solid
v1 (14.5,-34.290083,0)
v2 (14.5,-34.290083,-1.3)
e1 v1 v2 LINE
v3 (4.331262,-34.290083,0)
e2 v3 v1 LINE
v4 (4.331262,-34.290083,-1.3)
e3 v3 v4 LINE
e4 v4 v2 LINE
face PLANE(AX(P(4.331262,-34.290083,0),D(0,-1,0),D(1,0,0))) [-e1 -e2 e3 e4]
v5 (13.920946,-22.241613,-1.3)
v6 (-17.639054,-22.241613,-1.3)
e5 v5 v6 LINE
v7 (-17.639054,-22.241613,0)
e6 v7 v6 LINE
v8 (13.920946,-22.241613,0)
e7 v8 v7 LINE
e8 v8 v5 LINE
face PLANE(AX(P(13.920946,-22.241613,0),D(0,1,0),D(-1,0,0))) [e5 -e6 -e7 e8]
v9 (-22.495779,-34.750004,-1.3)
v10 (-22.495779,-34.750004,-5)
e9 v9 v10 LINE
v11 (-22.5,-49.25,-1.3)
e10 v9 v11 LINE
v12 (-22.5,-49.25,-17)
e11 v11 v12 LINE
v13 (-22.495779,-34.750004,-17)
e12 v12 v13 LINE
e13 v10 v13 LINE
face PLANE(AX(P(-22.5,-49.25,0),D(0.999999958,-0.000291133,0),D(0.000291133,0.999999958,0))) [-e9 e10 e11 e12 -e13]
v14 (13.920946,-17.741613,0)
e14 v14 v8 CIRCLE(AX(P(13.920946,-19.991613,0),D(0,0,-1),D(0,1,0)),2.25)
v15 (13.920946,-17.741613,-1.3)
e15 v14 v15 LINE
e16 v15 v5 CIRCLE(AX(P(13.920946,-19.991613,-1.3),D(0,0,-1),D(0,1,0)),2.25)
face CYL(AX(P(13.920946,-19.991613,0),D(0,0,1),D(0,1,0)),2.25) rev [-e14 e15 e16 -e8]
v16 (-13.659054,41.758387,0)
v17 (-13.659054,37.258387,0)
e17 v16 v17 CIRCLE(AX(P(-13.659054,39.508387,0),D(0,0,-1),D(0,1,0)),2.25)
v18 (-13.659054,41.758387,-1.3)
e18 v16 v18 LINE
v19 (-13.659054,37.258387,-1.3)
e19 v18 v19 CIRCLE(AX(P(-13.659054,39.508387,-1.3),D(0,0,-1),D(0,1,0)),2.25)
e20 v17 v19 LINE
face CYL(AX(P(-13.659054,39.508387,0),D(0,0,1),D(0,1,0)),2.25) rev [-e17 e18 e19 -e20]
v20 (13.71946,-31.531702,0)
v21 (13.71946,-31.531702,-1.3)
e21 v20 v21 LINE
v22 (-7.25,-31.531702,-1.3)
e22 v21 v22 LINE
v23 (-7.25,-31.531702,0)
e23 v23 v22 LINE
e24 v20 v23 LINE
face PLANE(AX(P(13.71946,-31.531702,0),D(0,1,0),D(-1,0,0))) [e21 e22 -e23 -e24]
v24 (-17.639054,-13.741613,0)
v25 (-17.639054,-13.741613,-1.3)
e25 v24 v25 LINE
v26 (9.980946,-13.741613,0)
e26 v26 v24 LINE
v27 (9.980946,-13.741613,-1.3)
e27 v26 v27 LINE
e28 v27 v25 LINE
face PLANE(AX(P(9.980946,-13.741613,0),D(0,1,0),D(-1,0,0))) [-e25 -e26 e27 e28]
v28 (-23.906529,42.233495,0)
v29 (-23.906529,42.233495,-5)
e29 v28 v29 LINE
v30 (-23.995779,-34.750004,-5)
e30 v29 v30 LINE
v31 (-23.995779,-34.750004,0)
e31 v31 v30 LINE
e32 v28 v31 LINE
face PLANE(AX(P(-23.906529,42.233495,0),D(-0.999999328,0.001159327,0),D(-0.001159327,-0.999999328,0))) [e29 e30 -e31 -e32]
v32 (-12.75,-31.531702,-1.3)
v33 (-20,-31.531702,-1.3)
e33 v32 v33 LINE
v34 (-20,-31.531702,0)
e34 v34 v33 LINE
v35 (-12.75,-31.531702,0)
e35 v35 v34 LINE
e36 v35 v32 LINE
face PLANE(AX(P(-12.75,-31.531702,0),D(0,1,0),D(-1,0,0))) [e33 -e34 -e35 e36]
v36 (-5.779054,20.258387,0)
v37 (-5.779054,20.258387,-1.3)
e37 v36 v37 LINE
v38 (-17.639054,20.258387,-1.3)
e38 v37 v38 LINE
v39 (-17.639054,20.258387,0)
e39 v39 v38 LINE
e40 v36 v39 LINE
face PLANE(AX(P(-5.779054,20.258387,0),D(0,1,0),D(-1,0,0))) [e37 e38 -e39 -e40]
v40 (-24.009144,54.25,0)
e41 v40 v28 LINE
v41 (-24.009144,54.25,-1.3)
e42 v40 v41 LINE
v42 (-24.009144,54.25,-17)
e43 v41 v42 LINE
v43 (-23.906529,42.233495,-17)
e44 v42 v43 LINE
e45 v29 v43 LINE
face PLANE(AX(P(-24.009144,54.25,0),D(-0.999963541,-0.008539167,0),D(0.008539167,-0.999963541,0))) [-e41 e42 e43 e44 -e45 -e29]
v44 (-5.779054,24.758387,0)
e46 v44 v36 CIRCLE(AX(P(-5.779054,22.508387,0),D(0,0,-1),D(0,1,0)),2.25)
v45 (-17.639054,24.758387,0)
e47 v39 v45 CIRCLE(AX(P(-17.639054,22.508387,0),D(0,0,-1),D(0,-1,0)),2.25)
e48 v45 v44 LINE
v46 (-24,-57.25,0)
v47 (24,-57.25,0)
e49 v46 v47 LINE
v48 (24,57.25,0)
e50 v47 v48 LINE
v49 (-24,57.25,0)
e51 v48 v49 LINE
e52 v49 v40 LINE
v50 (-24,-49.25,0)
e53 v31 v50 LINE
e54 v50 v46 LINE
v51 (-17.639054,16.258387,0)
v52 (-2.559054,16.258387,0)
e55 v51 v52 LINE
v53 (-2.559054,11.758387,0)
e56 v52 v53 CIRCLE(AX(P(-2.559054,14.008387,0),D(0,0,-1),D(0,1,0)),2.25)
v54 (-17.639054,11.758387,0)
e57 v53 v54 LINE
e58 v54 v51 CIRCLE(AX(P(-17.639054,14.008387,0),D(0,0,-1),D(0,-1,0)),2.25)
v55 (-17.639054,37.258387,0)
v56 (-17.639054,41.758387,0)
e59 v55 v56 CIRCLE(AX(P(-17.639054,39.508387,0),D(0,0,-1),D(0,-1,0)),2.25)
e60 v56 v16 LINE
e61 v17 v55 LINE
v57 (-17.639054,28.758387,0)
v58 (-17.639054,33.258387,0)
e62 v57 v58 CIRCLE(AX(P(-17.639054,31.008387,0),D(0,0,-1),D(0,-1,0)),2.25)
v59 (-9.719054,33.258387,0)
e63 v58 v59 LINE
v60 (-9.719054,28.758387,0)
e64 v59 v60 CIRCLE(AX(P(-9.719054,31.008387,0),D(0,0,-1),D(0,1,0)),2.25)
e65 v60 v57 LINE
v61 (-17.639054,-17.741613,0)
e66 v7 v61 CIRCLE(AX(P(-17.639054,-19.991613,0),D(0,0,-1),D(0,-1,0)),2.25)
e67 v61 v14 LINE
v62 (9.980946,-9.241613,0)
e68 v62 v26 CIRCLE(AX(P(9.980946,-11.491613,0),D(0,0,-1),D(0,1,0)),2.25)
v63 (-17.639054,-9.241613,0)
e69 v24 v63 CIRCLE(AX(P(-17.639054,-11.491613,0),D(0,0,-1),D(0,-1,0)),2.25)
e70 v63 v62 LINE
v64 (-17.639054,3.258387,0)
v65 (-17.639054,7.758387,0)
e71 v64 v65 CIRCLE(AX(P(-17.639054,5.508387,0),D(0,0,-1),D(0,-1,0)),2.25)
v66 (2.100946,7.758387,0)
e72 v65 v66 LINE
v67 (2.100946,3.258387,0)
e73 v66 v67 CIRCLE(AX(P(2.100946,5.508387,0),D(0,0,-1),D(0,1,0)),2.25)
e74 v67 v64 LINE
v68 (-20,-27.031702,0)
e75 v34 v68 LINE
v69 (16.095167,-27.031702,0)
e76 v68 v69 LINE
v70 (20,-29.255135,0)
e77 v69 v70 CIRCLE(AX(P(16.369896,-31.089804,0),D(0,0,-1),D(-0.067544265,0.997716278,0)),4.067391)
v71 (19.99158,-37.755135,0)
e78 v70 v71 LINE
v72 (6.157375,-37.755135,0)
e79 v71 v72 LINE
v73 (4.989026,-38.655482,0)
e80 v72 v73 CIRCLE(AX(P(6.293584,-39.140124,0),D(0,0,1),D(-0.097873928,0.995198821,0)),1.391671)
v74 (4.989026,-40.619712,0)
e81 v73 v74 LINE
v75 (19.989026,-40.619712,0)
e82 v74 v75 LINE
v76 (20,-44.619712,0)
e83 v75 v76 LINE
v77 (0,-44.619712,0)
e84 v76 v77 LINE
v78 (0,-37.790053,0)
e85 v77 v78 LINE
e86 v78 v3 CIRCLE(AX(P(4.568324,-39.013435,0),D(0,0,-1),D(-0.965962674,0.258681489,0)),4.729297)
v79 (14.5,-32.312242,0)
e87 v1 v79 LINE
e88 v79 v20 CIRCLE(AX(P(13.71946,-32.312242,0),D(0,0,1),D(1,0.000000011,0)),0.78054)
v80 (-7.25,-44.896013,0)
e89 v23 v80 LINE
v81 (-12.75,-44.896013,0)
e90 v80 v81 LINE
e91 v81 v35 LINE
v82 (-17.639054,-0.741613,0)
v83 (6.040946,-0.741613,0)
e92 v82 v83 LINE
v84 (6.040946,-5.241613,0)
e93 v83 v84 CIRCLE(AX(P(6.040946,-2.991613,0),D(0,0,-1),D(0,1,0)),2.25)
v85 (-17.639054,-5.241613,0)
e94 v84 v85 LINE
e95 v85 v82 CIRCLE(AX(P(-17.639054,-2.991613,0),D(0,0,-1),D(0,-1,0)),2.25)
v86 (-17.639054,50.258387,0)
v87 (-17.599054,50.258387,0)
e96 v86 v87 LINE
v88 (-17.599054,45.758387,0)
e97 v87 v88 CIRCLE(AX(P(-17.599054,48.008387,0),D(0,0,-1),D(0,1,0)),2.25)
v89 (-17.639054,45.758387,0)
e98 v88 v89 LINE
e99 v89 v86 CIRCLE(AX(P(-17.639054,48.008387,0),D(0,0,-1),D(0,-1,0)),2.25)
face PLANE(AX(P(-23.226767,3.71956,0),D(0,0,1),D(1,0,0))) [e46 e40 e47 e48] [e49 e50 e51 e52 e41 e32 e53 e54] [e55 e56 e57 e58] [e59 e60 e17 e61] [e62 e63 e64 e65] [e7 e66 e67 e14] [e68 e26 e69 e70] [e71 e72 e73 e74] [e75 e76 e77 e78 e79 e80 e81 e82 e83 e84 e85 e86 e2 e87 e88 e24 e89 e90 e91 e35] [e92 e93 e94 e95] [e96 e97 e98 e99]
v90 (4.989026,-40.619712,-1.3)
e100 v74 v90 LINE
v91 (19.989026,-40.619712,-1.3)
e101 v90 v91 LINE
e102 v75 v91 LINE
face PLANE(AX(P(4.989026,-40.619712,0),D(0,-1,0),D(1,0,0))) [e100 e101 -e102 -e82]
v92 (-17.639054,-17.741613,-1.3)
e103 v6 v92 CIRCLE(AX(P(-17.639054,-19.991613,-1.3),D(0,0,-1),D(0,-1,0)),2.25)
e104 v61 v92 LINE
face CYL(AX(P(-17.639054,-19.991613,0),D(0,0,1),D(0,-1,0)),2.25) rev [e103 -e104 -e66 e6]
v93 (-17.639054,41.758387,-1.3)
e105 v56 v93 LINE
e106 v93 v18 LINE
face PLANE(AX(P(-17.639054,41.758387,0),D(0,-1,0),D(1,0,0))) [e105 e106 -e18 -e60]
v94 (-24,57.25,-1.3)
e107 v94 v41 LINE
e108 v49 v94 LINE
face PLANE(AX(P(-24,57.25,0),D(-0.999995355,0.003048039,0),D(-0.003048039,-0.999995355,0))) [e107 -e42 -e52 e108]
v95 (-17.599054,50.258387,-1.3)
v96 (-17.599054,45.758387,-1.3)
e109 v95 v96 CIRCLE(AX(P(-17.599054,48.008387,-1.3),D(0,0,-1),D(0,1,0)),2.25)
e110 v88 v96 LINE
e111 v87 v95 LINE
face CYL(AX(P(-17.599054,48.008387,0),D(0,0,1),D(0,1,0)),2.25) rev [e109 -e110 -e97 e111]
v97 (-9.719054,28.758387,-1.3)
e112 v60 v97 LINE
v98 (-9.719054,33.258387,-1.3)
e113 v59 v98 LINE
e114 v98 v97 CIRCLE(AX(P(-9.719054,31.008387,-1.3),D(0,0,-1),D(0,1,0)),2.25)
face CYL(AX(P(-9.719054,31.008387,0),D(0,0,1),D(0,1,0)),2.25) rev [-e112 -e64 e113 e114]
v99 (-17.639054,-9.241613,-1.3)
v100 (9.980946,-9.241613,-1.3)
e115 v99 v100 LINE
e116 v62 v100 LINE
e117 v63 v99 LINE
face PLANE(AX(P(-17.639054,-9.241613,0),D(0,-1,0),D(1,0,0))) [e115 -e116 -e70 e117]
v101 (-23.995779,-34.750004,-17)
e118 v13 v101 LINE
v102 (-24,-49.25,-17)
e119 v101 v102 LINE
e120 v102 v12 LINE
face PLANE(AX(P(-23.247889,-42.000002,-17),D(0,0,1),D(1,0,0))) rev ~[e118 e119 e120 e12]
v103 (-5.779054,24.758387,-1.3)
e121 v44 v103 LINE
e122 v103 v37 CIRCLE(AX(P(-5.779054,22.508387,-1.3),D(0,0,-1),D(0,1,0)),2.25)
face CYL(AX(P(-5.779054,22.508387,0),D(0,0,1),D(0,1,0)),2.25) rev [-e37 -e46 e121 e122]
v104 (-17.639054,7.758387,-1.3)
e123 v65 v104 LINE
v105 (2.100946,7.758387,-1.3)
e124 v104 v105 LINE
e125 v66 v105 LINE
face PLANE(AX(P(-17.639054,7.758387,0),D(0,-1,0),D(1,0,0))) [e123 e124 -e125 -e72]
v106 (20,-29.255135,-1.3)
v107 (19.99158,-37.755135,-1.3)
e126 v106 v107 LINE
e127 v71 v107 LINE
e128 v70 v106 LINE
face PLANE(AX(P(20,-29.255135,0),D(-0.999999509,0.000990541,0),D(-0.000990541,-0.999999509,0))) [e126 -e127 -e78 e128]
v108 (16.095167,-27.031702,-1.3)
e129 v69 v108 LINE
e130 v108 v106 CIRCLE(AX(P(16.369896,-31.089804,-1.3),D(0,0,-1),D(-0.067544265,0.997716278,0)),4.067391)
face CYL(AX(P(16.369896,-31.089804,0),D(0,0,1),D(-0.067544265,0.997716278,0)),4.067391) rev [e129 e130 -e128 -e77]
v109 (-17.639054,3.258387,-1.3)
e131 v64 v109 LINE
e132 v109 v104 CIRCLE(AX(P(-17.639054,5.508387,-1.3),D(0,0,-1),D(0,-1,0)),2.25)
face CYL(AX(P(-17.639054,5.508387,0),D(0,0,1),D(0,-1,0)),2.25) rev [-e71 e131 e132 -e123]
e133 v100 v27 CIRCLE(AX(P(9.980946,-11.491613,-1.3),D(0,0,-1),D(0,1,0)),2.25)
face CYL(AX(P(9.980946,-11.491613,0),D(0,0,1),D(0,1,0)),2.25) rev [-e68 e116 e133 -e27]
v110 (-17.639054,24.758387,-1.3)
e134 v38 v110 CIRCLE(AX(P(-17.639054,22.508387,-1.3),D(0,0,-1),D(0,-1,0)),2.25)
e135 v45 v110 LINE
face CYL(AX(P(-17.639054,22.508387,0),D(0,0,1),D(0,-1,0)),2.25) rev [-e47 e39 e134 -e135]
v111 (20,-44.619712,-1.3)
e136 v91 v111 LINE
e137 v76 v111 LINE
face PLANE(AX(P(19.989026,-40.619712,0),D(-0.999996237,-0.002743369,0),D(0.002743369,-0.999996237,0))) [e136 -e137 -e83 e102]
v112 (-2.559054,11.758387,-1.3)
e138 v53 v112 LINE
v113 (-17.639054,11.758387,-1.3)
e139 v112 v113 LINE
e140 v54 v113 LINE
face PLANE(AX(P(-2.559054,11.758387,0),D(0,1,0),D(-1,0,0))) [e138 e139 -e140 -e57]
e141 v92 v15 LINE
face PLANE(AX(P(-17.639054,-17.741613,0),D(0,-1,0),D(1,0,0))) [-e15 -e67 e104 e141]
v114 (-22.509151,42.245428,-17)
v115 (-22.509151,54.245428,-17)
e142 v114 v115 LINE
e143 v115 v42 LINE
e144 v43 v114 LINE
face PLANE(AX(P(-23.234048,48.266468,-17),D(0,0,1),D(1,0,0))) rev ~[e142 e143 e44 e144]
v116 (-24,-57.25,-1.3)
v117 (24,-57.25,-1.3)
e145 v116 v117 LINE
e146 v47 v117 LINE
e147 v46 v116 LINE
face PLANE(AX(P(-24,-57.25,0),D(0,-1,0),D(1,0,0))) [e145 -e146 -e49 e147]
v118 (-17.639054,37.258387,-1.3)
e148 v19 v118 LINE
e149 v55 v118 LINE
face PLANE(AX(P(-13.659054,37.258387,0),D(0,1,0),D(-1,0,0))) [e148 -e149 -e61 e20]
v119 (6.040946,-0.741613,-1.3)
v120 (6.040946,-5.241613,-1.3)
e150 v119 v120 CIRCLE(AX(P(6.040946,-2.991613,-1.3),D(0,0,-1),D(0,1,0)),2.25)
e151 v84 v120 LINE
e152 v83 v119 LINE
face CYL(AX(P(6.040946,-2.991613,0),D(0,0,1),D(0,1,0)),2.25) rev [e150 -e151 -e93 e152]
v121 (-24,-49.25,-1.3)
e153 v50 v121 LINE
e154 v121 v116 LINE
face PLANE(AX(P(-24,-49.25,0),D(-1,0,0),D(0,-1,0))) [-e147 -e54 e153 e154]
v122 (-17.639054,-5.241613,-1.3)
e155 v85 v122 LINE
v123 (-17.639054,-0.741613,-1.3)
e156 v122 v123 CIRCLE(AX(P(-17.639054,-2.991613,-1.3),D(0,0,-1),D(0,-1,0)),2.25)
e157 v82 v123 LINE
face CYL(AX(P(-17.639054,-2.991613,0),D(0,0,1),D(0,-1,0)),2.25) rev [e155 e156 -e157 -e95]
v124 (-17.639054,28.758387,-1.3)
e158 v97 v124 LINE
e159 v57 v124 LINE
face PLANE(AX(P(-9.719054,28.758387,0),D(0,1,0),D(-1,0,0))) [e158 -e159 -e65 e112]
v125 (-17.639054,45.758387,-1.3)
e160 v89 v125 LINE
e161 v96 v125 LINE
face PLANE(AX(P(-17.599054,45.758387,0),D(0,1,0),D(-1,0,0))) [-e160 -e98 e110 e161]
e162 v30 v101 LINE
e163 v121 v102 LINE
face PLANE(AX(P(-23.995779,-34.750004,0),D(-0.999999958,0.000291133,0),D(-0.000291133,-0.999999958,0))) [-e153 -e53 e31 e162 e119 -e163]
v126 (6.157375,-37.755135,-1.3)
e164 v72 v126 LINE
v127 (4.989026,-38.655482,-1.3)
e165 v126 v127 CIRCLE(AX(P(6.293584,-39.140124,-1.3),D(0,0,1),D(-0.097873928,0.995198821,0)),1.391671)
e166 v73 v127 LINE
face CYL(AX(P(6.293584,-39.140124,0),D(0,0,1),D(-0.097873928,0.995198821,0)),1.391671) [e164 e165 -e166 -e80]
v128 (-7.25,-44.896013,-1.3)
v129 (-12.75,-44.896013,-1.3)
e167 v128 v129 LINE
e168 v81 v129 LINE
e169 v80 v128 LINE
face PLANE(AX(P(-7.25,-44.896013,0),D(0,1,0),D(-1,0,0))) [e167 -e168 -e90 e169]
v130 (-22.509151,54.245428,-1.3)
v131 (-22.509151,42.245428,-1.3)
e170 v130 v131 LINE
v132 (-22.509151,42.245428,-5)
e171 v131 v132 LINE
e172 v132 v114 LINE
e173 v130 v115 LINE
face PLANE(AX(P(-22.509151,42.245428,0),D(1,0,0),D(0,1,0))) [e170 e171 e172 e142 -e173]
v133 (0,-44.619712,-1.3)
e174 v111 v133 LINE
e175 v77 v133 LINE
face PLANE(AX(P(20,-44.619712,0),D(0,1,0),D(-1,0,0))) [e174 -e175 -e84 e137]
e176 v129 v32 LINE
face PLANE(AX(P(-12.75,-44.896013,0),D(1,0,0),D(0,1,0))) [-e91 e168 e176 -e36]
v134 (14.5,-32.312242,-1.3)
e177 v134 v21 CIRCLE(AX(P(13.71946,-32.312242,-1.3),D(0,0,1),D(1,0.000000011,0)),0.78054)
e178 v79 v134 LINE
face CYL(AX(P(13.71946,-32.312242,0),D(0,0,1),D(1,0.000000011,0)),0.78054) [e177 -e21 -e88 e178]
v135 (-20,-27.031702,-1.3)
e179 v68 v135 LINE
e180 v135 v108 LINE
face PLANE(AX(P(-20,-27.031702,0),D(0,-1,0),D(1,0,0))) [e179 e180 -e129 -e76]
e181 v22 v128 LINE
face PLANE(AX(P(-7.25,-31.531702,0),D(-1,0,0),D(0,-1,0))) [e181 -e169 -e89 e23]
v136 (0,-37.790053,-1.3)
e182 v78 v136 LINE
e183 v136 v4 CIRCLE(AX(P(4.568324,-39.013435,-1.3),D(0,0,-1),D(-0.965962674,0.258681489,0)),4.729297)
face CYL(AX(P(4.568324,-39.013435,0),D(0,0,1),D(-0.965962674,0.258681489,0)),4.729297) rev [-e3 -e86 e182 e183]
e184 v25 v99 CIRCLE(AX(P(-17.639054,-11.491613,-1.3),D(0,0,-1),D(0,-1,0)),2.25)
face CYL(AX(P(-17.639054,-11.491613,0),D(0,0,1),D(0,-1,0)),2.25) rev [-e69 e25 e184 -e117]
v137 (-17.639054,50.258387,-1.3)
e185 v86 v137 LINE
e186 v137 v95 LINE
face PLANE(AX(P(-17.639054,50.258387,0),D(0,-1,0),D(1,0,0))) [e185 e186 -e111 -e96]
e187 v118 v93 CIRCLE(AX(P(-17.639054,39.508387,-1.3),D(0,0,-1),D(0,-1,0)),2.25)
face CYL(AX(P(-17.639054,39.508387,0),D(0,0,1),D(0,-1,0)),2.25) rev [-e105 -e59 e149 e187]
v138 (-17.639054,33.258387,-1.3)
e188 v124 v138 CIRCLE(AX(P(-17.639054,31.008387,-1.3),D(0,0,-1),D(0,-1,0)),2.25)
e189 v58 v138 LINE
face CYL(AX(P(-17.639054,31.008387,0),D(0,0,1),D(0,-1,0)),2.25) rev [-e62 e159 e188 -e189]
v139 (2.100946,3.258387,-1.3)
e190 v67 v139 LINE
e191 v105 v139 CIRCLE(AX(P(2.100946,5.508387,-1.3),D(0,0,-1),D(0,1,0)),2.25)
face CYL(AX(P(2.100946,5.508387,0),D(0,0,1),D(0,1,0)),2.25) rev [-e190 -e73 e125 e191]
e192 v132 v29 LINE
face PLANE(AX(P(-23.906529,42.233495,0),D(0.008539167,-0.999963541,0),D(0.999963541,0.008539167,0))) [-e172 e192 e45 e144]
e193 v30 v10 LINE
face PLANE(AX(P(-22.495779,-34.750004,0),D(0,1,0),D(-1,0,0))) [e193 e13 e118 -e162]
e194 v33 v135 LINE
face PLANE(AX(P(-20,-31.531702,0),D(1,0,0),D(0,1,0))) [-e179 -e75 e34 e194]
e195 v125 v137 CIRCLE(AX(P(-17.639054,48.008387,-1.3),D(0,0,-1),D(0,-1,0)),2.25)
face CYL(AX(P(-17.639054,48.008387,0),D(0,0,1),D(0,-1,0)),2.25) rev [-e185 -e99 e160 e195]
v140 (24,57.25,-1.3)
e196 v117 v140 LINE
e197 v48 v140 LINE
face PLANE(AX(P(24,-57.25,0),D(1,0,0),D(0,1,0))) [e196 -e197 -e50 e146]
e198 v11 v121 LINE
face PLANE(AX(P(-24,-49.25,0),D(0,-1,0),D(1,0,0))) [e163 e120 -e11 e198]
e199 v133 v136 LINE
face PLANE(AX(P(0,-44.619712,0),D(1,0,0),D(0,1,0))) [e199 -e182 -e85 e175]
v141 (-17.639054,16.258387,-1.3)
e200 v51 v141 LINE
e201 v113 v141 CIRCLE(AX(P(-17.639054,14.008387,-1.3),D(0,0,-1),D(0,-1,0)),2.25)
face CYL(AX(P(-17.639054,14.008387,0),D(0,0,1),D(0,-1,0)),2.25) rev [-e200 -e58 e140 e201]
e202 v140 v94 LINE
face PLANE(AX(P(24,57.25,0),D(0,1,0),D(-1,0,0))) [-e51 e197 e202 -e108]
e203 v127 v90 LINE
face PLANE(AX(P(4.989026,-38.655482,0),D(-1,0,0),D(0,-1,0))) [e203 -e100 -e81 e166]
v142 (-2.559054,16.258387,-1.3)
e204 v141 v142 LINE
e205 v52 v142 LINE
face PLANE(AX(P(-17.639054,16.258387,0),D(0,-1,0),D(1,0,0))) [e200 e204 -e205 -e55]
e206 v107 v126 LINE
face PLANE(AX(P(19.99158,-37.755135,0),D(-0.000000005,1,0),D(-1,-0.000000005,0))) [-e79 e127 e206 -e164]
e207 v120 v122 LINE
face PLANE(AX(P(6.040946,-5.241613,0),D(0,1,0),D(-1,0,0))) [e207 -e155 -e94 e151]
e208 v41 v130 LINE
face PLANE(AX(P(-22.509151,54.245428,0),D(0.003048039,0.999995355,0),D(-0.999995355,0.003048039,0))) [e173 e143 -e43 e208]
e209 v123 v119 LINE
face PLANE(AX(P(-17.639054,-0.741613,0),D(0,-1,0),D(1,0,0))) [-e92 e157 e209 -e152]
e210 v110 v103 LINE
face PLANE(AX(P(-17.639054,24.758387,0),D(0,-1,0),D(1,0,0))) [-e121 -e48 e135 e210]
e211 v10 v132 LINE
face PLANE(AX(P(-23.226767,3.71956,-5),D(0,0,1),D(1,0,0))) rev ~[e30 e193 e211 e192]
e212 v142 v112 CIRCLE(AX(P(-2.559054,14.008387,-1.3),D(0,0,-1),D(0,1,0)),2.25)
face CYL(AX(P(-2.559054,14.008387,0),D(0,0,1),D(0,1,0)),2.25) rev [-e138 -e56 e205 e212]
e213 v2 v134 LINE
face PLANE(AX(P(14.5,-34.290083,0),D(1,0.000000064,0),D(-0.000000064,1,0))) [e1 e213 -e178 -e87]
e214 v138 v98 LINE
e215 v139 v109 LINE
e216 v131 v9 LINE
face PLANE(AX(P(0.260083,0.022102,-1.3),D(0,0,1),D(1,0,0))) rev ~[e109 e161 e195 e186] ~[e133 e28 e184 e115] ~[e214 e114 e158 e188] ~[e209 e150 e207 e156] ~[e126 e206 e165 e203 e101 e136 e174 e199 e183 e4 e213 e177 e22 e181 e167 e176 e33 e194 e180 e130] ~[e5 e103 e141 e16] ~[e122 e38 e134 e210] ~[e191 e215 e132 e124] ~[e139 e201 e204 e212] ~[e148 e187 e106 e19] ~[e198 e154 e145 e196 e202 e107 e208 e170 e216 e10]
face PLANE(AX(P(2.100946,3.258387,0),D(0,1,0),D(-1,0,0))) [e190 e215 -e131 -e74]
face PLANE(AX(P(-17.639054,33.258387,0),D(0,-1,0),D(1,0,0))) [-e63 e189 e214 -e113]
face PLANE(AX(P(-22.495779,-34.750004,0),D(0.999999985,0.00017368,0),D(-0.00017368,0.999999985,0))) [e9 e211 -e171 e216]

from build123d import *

# Parameters (mm, degrees)
F1_DEPTH = 1.3
F2_DEPTH = 17
F4_DEPTH = 5


# Not quite as in the source:
# - a feature names something its author has since deleted; it is built from what else it names


with BuildPart() as f1:
    # F0 (on Top) → F1 (new body)
    with BuildSketch(Plane.XY):
        Polygon((24, 57.25), (-24, 57.25), (-24.0091441598, 54.25), (-22.5091511277, 54.2454279414), (-22.5091511277, 42.2454279414), (-22.4957785658, -34.7500035641), (-22.5, -49.25), (-24, -49.25), (-24, -57.25), (24, -57.25), align=None)
        with BuildLine():
            Line((13.9209458456, -22.2416133583), (-17.6390541544, -22.2416133583))
            ThreePointArc((-17.6390541544, -22.2416133583), (-19.8890541544, -19.9916133583), (-17.6390541544, -17.7416133583))
            Line((-17.6390541544, -17.7416133583), (13.9209458456, -17.7416133583))
            ThreePointArc((13.9209458456, -17.7416133583), (16.1709458456, -19.9916133583), (13.9209458456, -22.2416133583))
        make_face(mode=Mode.SUBTRACT)
        with BuildLine():
            Line((9.9809458456, -13.7416133583), (-17.6390541544, -13.7416133583))
            ThreePointArc((-17.6390541544, -13.7416133583), (-19.8890541544, -11.4916133583), (-17.6390541544, -9.2416133583))
            Line((-17.6390541544, -9.2416133583), (9.9809458456, -9.2416133583))
            ThreePointArc((9.9809458456, -9.2416133583), (12.2309458456, -11.4916133583), (9.9809458456, -13.7416133583))
        make_face(mode=Mode.SUBTRACT)
        with BuildLine():
            Line((6.0409458456, -5.2416133583), (-17.6390541544, -5.2416133583))
            ThreePointArc((-17.6390541544, -5.2416133583), (-19.8890541544, -2.9916133583), (-17.6390541544, -0.7416133583))
            Line((-17.6390541544, -0.7416133583), (6.0409458456, -0.7416133583))
            ThreePointArc((6.0409458456, -0.7416133583), (8.2909458456, -2.9916133583), (6.0409458456, -5.2416133583))
        make_face(mode=Mode.SUBTRACT)
        with BuildLine():
            Line((-19.9999999992, -31.5317022603), (-19.9999999992, -27.0317022603))
            Line((-19.9999999992, -27.0317022603), (16.0951670268, -27.0317022603))
            ThreePointArc((16.0951670268, -27.0317022603), (18.3824934665, -27.555243649), (19.9999999704, -29.25513498))
            Line((19.9999999704, -29.25513498), (19.991580365, -37.75513498))
            Line((19.991580365, -37.75513498), (6.1573753969, -37.7551350426))
            ThreePointArc((6.1573753969, -37.7551350426), (5.4441089744, -38.037790108), (4.9890264818, -38.6554816172))
            Line((4.9890264818, -38.6554816172), (4.9890264818, -40.6197120801))
            Line((4.9890264818, -40.6197120801), (19.9890264818, -40.6197120801))
            Line((19.9890264818, -40.6197120801), (20, -44.6197120801))
            Line((20, -44.6197120801), (0, -44.6197120801))
            Line((0, -44.6197120801), (0, -37.7900532508))
            ThreePointArc((0, -37.7900532508), (1.5958871284, -35.3350022858), (4.3312619815, -34.2900834468))
            Line((4.3312619815, -34.2900834468), (14.5000001306, -34.2900834468))
            Line((14.5000001306, -34.2900834468), (14.5000000048, -32.3122422563))
            ThreePointArc((14.5000000048, -32.3122422563), (14.2713851276, -31.7603171319), (13.7194600008, -31.5317022603))
            Line((13.7194600008, -31.5317022603), (-7.2499999992, -31.5317022603))
            Line((-7.2499999992, -31.5317022603), (-7.2499999992, -44.8960133593))
            Line((-7.2499999992, -44.8960133593), (-12.7499999992, -44.8960133593))
            Line((-12.7499999992, -44.8960133593), (-12.7499999992, -31.5317022603))
            Line((-12.7499999992, -31.5317022603), (-19.9999999992, -31.5317022603))
        make_face(mode=Mode.SUBTRACT)
        with BuildLine():
            Line((2.1009458456, 3.2583866417), (-17.6390541544, 3.2583866417))
            ThreePointArc((-17.6390541544, 3.2583866417), (-19.8890541544, 5.5083866417), (-17.6390541544, 7.7583866417))
            Line((-17.6390541544, 7.7583866417), (2.1009458456, 7.7583866417))
            ThreePointArc((2.1009458456, 7.7583866417), (4.3509458456, 5.5083866417), (2.1009458456, 3.2583866417))
        make_face(mode=Mode.SUBTRACT)
        with BuildLine():
            Line((-2.5590541544, 11.7583866417), (-17.6390541544, 11.7583866417))
            ThreePointArc((-17.6390541544, 11.7583866417), (-19.8890541544, 14.0083866417), (-17.6390541544, 16.2583866417))
            Line((-17.6390541544, 16.2583866417), (-2.5590541544, 16.2583866417))
            ThreePointArc((-2.5590541544, 16.2583866417), (-0.3090541544, 14.0083866417), (-2.5590541544, 11.7583866417))
        make_face(mode=Mode.SUBTRACT)
        with BuildLine():
            Line((-5.7790541544, 20.2583866417), (-17.6390541544, 20.2583866417))
            ThreePointArc((-17.6390541544, 20.2583866417), (-19.8890541544, 22.5083866417), (-17.6390541544, 24.7583866417))
            Line((-17.6390541544, 24.7583866417), (-5.7790541544, 24.7583866417))
            ThreePointArc((-5.7790541544, 24.7583866417), (-3.5290541544, 22.5083866417), (-5.7790541544, 20.2583866417))
        make_face(mode=Mode.SUBTRACT)
        with BuildLine():
            Line((-9.7190541544, 28.7583866417), (-17.6390541544, 28.7583866417))
            ThreePointArc((-17.6390541544, 28.7583866417), (-19.8890541544, 31.0083866417), (-17.6390541544, 33.2583866417))
            Line((-17.6390541544, 33.2583866417), (-9.7190541544, 33.2583866417))
            ThreePointArc((-9.7190541544, 33.2583866417), (-7.4690541544, 31.0083866417), (-9.7190541544, 28.7583866417))
        make_face(mode=Mode.SUBTRACT)
        with BuildLine():
            Line((-13.6590541544, 37.2583866417), (-17.6390541544, 37.2583866417))
            ThreePointArc((-17.6390541544, 37.2583866417), (-19.8890541544, 39.5083866417), (-17.6390541544, 41.7583866417))
            Line((-17.6390541544, 41.7583866417), (-13.6590541544, 41.7583866417))
            ThreePointArc((-13.6590541544, 41.7583866417), (-11.4090541544, 39.5083866417), (-13.6590541544, 37.2583866417))
        make_face(mode=Mode.SUBTRACT)
        with BuildLine():
            Line((-17.5990541544, 45.7583866417), (-17.6390541544, 45.7583866417))
            ThreePointArc((-17.6390541544, 45.7583866417), (-19.8890541544, 48.0083866417), (-17.6390541544, 50.2583866417))
            Line((-17.6390541544, 50.2583866417), (-17.5990541544, 50.2583866417))
            ThreePointArc((-17.5990541544, 50.2583866417), (-15.3490541544, 48.0083866417), (-17.5990541544, 45.7583866417))
        make_face(mode=Mode.SUBTRACT)
    extrude(amount=-F1_DEPTH)

    # F0 (on Top) → F2 (join)
    with BuildSketch(Plane.XY):
        Polygon((-22.5091511277, 54.2454279414), (-24.0091441598, 54.25), (-23.9065294749, 42.2334950591), (-22.5091511277, 42.2454279414), align=None)
        Polygon((-22.4957785658, -34.7500035641), (-23.9957785658, -34.7500035641), (-24, -49.25), (-22.5, -49.25), align=None)
    extrude(amount=-F2_DEPTH)

    # F0 (on Top) → F4 (join)
    with BuildSketch(Plane.XY):
        Polygon((-22.5091511277, 42.2454279414), (-23.9065294749, 42.2334950591), (-23.9957785658, -34.7500035641), (-22.4957785658, -34.7500035641), align=None)
    extrude(amount=-F4_DEPTH)


solid = f1.part
